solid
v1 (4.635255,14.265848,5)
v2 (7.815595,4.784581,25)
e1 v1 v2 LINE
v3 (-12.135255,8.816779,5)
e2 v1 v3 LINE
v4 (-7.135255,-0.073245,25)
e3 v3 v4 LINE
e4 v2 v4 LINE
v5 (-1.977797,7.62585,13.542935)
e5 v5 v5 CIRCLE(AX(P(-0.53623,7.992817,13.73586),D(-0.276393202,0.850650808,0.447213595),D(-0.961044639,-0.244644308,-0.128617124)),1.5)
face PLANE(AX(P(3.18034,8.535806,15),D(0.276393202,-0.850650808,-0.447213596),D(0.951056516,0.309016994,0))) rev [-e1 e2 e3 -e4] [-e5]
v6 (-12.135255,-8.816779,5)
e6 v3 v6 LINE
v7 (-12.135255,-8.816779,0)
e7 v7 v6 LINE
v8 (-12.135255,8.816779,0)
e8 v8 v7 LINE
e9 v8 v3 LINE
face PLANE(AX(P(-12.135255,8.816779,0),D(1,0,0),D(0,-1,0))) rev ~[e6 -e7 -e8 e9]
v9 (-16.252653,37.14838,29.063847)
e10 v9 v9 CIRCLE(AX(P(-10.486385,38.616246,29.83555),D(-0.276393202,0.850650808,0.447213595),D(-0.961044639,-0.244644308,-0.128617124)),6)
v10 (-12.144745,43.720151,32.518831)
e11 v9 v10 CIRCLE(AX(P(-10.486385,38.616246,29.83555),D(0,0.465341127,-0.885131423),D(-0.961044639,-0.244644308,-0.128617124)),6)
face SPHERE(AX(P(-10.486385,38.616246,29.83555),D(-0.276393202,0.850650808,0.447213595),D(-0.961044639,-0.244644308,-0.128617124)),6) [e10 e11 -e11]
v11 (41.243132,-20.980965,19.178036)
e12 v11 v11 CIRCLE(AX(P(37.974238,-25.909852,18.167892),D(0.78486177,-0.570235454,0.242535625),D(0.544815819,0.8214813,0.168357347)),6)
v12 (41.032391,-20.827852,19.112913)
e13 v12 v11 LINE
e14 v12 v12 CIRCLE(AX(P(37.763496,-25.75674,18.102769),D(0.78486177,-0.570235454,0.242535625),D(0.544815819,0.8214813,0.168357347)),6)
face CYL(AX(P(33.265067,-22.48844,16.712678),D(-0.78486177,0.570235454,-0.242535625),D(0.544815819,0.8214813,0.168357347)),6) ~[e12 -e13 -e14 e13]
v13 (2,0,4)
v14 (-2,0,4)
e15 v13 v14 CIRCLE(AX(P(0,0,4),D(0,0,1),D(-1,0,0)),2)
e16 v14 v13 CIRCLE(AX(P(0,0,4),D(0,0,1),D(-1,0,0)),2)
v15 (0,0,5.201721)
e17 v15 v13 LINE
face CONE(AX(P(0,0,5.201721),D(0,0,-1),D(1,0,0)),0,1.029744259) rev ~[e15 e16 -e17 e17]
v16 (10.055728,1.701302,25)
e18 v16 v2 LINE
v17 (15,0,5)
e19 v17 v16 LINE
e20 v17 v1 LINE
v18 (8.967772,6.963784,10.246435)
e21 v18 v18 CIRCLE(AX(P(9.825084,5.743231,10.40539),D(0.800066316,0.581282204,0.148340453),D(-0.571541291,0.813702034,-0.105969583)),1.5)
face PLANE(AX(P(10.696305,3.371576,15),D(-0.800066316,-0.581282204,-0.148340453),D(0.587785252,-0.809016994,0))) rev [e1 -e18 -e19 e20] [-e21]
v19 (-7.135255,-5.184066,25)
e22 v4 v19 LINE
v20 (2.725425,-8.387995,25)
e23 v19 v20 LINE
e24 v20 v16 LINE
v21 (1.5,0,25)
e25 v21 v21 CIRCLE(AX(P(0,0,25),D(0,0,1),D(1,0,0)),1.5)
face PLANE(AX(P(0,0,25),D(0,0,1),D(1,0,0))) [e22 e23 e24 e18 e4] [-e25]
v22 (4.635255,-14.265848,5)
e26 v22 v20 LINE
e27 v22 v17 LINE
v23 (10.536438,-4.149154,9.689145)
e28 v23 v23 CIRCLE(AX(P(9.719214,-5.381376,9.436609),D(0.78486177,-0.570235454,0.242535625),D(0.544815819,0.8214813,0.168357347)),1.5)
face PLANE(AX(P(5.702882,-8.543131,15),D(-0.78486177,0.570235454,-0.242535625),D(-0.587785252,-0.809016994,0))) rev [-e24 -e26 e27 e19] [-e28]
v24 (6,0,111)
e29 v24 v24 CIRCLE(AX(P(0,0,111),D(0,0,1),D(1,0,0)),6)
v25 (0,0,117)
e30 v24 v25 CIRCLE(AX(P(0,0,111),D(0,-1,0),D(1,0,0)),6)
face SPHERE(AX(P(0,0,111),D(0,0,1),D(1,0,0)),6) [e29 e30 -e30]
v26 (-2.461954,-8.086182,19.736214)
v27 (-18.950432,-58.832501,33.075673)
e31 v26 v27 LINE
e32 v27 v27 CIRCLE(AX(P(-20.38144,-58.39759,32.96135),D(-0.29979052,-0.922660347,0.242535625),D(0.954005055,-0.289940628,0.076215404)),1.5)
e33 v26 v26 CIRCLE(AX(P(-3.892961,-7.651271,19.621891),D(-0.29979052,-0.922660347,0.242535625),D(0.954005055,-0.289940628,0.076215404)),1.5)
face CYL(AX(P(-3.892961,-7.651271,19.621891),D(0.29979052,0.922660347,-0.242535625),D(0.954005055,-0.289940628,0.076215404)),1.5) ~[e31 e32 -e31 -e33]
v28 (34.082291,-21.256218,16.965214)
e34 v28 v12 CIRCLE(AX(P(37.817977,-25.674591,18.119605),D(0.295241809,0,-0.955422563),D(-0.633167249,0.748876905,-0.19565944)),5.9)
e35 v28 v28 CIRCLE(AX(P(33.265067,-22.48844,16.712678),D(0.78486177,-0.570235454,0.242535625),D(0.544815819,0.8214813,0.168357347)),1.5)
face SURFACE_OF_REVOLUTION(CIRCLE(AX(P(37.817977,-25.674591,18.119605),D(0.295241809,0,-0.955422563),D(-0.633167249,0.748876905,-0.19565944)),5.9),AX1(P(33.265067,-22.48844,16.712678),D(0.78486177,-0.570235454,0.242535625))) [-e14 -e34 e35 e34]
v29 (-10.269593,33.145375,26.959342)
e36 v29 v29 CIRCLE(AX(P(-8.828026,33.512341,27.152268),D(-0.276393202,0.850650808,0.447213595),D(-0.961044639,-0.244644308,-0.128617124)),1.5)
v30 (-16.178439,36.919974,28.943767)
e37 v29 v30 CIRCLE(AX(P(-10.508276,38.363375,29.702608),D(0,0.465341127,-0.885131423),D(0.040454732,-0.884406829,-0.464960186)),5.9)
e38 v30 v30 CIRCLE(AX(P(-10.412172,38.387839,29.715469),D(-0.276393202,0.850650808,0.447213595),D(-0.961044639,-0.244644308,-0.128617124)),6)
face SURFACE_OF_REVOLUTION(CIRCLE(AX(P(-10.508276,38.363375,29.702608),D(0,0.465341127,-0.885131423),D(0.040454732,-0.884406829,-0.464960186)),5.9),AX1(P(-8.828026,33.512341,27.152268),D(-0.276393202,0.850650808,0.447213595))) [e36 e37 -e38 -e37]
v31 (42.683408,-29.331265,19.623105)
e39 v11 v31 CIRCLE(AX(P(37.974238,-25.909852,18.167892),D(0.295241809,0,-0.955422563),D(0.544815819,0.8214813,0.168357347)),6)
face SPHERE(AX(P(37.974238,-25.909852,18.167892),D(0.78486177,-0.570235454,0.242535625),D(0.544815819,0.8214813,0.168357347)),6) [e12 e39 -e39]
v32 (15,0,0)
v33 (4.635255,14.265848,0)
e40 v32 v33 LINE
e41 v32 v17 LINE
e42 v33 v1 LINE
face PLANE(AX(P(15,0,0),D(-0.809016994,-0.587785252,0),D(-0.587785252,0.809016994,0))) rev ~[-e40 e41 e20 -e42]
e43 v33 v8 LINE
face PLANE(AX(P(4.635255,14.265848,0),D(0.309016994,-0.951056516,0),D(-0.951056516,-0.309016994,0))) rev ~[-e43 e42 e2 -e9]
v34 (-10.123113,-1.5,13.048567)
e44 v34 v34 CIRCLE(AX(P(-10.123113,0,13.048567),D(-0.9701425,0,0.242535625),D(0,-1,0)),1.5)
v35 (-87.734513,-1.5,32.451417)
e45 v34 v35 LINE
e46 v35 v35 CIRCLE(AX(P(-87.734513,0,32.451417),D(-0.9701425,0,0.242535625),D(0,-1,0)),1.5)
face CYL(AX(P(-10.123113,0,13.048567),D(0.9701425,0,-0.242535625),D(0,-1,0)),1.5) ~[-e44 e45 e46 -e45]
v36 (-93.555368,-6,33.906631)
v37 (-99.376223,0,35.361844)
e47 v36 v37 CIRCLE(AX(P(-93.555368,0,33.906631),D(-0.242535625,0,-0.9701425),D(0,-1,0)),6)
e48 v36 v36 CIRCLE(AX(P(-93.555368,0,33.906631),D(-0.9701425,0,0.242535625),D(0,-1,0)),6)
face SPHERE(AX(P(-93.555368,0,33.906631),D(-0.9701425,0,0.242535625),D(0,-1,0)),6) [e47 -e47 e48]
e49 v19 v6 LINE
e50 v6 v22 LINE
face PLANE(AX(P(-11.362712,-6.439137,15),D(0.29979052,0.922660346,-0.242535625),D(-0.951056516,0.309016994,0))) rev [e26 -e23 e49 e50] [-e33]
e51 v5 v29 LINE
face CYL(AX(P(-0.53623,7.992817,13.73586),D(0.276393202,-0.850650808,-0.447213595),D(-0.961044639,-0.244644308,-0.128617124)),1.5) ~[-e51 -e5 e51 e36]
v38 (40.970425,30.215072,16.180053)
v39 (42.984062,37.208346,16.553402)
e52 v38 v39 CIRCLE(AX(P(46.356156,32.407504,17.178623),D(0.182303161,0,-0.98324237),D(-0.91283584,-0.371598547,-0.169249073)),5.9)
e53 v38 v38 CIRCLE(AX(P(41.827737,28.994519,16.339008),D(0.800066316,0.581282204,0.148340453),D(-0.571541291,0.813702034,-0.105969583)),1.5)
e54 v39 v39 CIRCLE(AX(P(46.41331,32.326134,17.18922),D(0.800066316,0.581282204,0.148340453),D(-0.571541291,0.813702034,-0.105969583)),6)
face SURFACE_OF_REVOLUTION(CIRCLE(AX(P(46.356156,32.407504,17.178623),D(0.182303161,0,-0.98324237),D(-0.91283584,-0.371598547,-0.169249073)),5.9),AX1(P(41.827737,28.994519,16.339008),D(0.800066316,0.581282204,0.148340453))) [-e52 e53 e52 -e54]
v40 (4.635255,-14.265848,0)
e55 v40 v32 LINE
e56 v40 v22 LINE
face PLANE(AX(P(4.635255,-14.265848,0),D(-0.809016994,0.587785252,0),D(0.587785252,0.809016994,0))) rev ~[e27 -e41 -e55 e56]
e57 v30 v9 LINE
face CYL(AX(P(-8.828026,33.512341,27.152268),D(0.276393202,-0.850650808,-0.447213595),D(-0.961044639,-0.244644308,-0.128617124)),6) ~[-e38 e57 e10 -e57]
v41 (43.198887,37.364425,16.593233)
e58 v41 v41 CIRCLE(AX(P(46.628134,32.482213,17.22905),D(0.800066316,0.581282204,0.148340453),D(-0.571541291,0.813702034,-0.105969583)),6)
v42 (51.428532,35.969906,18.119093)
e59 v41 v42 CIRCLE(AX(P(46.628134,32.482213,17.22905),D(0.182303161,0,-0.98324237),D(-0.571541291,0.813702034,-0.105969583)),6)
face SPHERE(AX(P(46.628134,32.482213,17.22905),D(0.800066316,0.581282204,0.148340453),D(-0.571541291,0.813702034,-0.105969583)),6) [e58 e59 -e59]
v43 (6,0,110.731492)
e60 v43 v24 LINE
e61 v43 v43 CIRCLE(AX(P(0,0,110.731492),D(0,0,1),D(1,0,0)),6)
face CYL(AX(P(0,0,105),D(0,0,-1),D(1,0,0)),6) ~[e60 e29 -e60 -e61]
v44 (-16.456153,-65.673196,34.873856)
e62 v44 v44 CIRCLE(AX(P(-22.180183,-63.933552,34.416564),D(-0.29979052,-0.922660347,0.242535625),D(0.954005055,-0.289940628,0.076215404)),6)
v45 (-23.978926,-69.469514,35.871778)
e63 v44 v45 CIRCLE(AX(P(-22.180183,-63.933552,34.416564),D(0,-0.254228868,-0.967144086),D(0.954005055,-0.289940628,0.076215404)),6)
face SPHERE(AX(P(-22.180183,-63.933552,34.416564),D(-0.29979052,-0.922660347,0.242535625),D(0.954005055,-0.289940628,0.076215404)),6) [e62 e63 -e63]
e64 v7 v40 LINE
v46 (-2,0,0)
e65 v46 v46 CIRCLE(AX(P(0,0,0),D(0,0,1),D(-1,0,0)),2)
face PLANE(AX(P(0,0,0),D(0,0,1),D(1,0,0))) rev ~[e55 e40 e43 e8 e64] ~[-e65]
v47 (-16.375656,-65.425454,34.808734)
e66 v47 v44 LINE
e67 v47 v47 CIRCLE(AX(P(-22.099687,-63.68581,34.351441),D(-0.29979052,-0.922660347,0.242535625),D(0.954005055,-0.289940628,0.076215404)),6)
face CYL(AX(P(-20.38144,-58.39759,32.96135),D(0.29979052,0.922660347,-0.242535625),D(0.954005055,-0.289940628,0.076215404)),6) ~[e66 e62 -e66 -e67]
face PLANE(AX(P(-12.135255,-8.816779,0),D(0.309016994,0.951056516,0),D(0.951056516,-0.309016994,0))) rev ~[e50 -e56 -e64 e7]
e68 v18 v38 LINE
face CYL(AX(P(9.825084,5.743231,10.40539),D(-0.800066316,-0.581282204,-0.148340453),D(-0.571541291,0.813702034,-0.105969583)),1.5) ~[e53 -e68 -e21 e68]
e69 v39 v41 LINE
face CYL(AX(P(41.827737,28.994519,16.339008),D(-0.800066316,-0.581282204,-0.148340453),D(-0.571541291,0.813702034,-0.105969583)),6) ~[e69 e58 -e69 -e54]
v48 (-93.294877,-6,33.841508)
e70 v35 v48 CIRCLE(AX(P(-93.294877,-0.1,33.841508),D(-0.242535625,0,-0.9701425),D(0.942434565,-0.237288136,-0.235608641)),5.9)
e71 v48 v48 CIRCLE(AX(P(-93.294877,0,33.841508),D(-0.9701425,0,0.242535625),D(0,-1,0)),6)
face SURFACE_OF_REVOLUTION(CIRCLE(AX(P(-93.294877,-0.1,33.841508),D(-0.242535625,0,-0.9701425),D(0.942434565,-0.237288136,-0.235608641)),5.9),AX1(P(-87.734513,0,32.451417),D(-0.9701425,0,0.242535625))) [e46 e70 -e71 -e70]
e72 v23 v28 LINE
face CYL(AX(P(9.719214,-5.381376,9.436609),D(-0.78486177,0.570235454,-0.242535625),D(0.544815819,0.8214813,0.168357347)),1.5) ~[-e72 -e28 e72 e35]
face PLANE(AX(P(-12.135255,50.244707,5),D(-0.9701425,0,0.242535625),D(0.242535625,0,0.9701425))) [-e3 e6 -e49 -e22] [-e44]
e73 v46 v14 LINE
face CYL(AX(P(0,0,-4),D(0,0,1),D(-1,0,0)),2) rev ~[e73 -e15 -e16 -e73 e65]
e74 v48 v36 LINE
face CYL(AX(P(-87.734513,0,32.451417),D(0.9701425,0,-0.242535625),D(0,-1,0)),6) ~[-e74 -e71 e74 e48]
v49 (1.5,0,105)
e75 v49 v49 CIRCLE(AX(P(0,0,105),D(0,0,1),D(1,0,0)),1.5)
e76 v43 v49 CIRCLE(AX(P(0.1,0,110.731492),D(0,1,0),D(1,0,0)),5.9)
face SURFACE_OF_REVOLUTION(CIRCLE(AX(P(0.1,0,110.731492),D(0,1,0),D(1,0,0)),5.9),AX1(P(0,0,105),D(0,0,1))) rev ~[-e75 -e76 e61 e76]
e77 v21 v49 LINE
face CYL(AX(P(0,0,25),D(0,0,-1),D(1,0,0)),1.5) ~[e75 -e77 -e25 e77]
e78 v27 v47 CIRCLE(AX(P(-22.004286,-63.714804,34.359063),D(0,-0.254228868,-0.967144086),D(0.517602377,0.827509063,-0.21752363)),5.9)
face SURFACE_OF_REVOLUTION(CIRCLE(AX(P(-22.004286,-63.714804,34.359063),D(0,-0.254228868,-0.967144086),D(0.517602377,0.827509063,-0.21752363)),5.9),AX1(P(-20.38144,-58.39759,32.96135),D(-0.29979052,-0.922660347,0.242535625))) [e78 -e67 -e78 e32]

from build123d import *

# Parameters (mm, degrees)
F1_DEPTH    = 25
F2_SIZE2    = 5
F2_SIZE     = 20
F3_SIZE2    = 5
F3_SIZE     = 20
F4_SIZE2    = 3
F4_SIZE     = 20
F5_SIZE2    = 10
F5_SIZE     = 20
F6_T1_DEPTH = 105.7467241961
F7_R        = 1.5
F13_DEPTH   = 80
F8_R        = 1.5
F14_DEPTH   = 30
F9_R        = 1.5
F15_DEPTH   = 40
F10_R       = 1.5
F16_DEPTH   = 30
F11_R       = 1.5
F17_DEPTH   = 80
F12_R       = 1.5
F18_DEPTH   = 55
F19_R       = 6
F25_DEPTH   = 12
F20_R       = 6
F26_DEPTH   = 12
F21_R       = 6
F27_DEPTH   = 12
F22_R       = 6
F28_DEPTH   = 12
F23_R       = 6
F29_DEPTH   = 12
F24_R       = 6
F30_DEPTH   = 12
F31_R       = 6
F34_D       = 4
F34_DEPTH   = 4
F34_TIP     = 1.2017212381


# Not quite as in the source:
# - a fillet or chamfer that OpenCascade refuses, or shapes differently, is made with other operations: its cross-section is extruded or revolved along the edge and cut away or added


with BuildPart() as f1:
    # F0 (on Top) → F1 (new body)
    with BuildSketch(Plane.XY):
        Polygon((15, 0), (4.6352549156, 14.2658477444), (-12.1352549156, 8.8167787844), (-12.1352549156, -8.8167787844), (4.6352549156, -14.2658477444), align=None)
    extrude(amount=F1_DEPTH)

    # F2
    f2_edges = [f1.edges().sort_by_distance(p)[0] for p in [
        (-3.75, -11.541313, 25),
    ]]
    f2_side = f1.faces().sort_by_distance((-3.75, -11.541313, 12.5))[0]
    chamfer(f2_edges, length=F2_SIZE, length2=F2_SIZE2, reference=f2_side)

    # F3
    f3_edges = [f1.edges().sort_by_distance(p)[0] for p in [
        (11.362712, -5.006297, 25),
    ]]
    f3_side = f1.faces().sort_by_distance((10.379872, -6.359061, 11.710138))[0]
    chamfer(f3_edges, length=F3_SIZE, length2=F3_SIZE2, reference=f3_side)

    # F4
    f4_edges = [f1.edges().sort_by_distance(p)[0] for p in [
        (8.272542, 9.259551, 25),
    ]]
    f4_side = f1.faces().sort_by_distance((9.255383, 7.906786, 11.710138))[0]
    chamfer(f4_edges, length=F4_SIZE, length2=F4_SIZE2, reference=f4_side)

    # F5
    f5_edges = [f1.edges().sort_by_distance(p)[0] for p in [
        (-5.25, 11.053934, 25),
    ]]
    f5_side = f1.faces().sort_by_distance((-4.319172, 11.356378, 12.050432))[0]
    chamfer(f5_edges, length=F5_SIZE, length2=F5_SIZE2, reference=f5_side)

    # F6: chamfer of 20 x 5 on 1 edges, made by hand

    # F6_s2 → F6_t1 (cut)
    with BuildSketch(Plane.XZ.offset(-50.2447065374)):
        Polygon((-12.1352549156, 5), (-7.1352549156, 25), (-12.1352549156, 25), align=None)
    extrude(amount=F6_T1_DEPTH, mode=Mode.SUBTRACT)

    # F7 (on face) → F13 (join)
    with BuildSketch(Plane(origin=(-12.5978869794, 0, 3.1494717449), x_dir=(0, -1, 0), z_dir=(-0.9701425001, 0, 0.242535625))):
        with Locations((0, 10.203753598)):
            Circle(F7_R)
    extrude(amount=F13_DEPTH)

    # F8 (on face) → F14 (join)
    with BuildSketch(Plane(origin=(-3.6180339887, 11.1351636441, 5.8541019662), x_dir=(-0.9610446388, -0.2446443083, -0.1286171243), z_dir=(-0.2763932023, 0.8506508084, 0.4472135955))):
        with Locations((-3.206722904, 8.4386551753)):
            Circle(F8_R)
    extrude(amount=F14_DEPTH)

    # F9 (on face) → F15 (join)
    with BuildSketch(Plane(origin=(10.1950026441, 7.4071029941, 1.8902574448), x_dir=(-0.5715412914, 0.8137020337, -0.1059695832), z_dir=(0.8000663158, 0.5812822037, 0.1483404529))):
        with Locations((-2.0448169671, 8.4398761392)):
            Circle(F9_R)
    extrude(amount=F15_DEPTH)

    # F10 (on face) → F16 (join)
    with BuildSketch(Plane(origin=(10.1919046596, -7.4048521765, 3.1494717449), x_dir=(0.5448158193, 0.8214813003, 0.168357347), z_dir=(0.7848617696, -0.5702354542, 0.242535625))):
        with Locations((2.4632040877, 6.1464309692)):
            Circle(F10_R)
    extrude(amount=F16_DEPTH)

    # F11 (on face) → F17 (join)
    with BuildSketch(Plane.XY.offset(25)):
        Circle(F11_R)
    extrude(amount=F17_DEPTH)

    # F12 (on face) → F18 (join)
    with BuildSketch(Plane(origin=(-3.8929611699, -11.9813025033, 3.1494717449), x_dir=(0.9540050547, -0.2899406279, 0.0762154044), z_dir=(-0.2997905195, -0.9226603465, 0.242535625))):
        with Locations((0, 17.0320216566)):
            Circle(F12_R)
    extrude(amount=F18_DEPTH)

    # F19 (on face) → F25 (join)
    with BuildSketch(Plane(origin=(-20.3814397429, -62.7276215607, 16.4889311219), x_dir=(0.9540050547, -0.2899406279, 0.0762154044), z_dir=(-0.2997905195, -0.9226603465, 0.242535625))):
        with Locations((0, 17.0320216566)):
            Circle(F19_R)
    extrude(amount=F25_DEPTH)

    # F20 (on face) → F26 (join)
    with BuildSketch(Plane(origin=(33.737757747, -24.5119158028, 10.4255404959), x_dir=(0.5448158193, 0.8214813003, 0.168357347), z_dir=(0.7848617696, -0.5702354542, 0.242535625))):
        with Locations((2.4632040877, 6.1464309692)):
            Circle(F20_R)
    extrude(amount=F26_DEPTH)

    # F21 (on face) → F27 (join)
    with BuildSketch(Plane(origin=(42.1976552771, 30.6583911409, 7.823875562), x_dir=(-0.5715412914, 0.8137020337, -0.1059695832), z_dir=(0.8000663158, 0.5812822037, 0.1483404529))):
        with Locations((-2.0448169671, 8.4398761392)):
            Circle(F21_R)
    extrude(amount=F27_DEPTH)

    # F22 (on face) → F28 (join)
    with BuildSketch(Plane(origin=(-11.9098300563, 36.6546878947, 19.2705098312), x_dir=(-0.9610446388, -0.2446443083, -0.1286171243), z_dir=(-0.2763932023, 0.8506508084, 0.4472135955))):
        with Locations((-3.206722904, 8.4386551753)):
            Circle(F22_R)
    extrude(amount=F28_DEPTH)

    # F23 (on face) → F29 (join)
    with BuildSketch(Plane(origin=(-90.209286991, 0, 22.5523217478), x_dir=(0, -1, 0), z_dir=(-0.9701425001, 0, 0.242535625))):
        with Locations((0, 10.203753598)):
            Circle(F23_R)
    extrude(amount=F29_DEPTH)

    # F24 (on face) → F30 (join)
    with BuildSketch(Plane.XY.offset(105)):
        Circle(F24_R)
    extrude(amount=F30_DEPTH)

    # F31
    f31_edges = [f1.edges().sort_by_distance(p)[0] for p in [
        (-99.376223, 6, 35.361844),
        (-6.378477, 45.188017, 33.290534),
        (-6, 0, 117),
        (54.85778, 31.087694, 18.754911),
        (-29.702956, -67.72987, 35.414485),
        (39.414513, -34.260153, 18.612961),
    ]]
    fillet(f31_edges, radius=F31_R)

    # F32: fillet of radius 5.9 on 6 edges, made by hand

    # F32_s1 → F32_t2 (revolve, cut)
    with BuildSketch(Plane(origin=(0, -3.9268533113, 7.4693188604), x_dir=(1, 0, 0), z_dir=(0, 0.4653411272, -0.8851314226))):
        with BuildLine():
            ThreePointArc((-10.2695931595, -41.8833034178), (-13.9610472636, -42.9942942584), (-16.1784394484, -46.1477536208))
            Line((-16.1784394484, -46.1477536208), (-14.594294034, -40.6395340077))
            Line((-14.594294034, -40.6395340077), (-10.2695931595, -41.8833034178))
        make_face()
    revolve(axis=Axis((-8.8280262013, 33.5123410902, 27.15226817), (-0.2763932023, 0.8506508084, 0.4472135955)), mode=Mode.SUBTRACT)

    # F32_s3 → F32_t4 (revolve, cut)
    with BuildSketch(Plane(origin=(-1.5386160993, 0, 8.2984438146), x_dir=(0, 1, 0), z_dir=(0.1823031611, 0, -0.9832423696))):
        with BuildLine():
            ThreePointArc((30.2150724668, 43.2335322221), (34.0656604389, 43.0488532565), (37.208345891, 45.2814889635))
            Line((37.208345891, 45.2814889635), (33.8767316186, 40.6177623056))
            Line((33.8767316186, 40.6177623056), (30.2150724668, 43.2335322221))
        make_face()
    revolve(axis=Axis((41.8277365078, 28.9945194162, 16.3390077783), (0.8000663158, 0.5812822037, 0.1483404529)), mode=Mode.SUBTRACT)

    # F32_s5 → F32_t6 (revolve, cut)
    with BuildSketch(Plane.XZ):
        with BuildLine():
            ThreePointArc((6, 110.7314919524), (4.7405818601, 107.0880046119), (1.5, 105))
            Line((1.5, 105), (6, 105))
            Line((6, 105), (6, 110.7314919524))
        make_face()
    revolve(axis=Axis((0, 0, 105), (0, 0, 1)), mode=Mode.SUBTRACT)

    # F32_s7 → F32_t8 (revolve, cut)
    with BuildSketch(Plane(origin=(-1.8146833973, 0, 5.8724388313), x_dir=(0, 1, 0), z_dir=(0.2952418088, 0, -0.9554225632))):
        with BuildLine():
            ThreePointArc((-21.2562177554, 37.5718299013), (-19.7847946135, 41.1349813138), (-20.8278518207, 44.8462029069))
            Line((-20.8278518207, 44.8462029069), (-17.559551904, 40.1378894452))
            Line((-17.559551904, 40.1378894452), (-21.2562177554, 37.5718299013))
        make_face()
    revolve(axis=Axis((33.2650669029, -22.4884397059, 16.7126778325), (0.7848617696, -0.5702354542, 0.242535625)), mode=Mode.SUBTRACT)

    # F32_s9 → F32_t10 (revolve, cut)
    with BuildSketch(Plane(origin=(0, 4.3300315839, 16.4724190146), x_dir=(1, 0, 0), z_dir=(0, -0.2542288679, -0.9671440858))):
        with BuildLine():
            ThreePointArc((-18.9504321609, 65.3082962809), (-16.4848646735, 68.2717589543), (-16.3756563646, 72.1252259123))
            Line((-16.3756563646, 72.1252259123), (-14.6574094147, 66.6573536187))
            Line((-14.6574094147, 66.6573536187), (-18.9504321609, 65.3082962809))
        make_face()
    revolve(axis=Axis((-20.3814397429, -58.3975899768, 32.9613501365), (-0.2997905195, -0.9226603465, 0.242535625)), mode=Mode.SUBTRACT)

    # F32_s11 → F32_t12 (revolve, cut)
    with BuildSketch(Plane(origin=(2.4747737566, 0, 9.8990950265), x_dir=(0, 1, 0), z_dir=(-0.242535625, 0, -0.9701425001))):
        with BuildLine():
            ThreePointArc((-1.5, -92.9856046689), (-4.7405818601, -95.0736092808), (-6, -98.7170966213))
            Line((-6, -98.7170966213), (-6, -92.9856046689))
            Line((-6, -92.9856046689), (-1.5, -92.9856046689))
        make_face()
    revolve(axis=Axis((-87.7345132344, 0, 32.4514167742), (-0.9701425001, 0, 0.242535625)), mode=Mode.SUBTRACT)

    # F34
    with Locations(Plane(origin=(0, 0, 0), x_dir=(1, 0, 0), z_dir=(0, 0, -1))):
        with Locations((0, 0)):
            Hole(F34_D / 2, depth=F34_DEPTH)
            with Locations((0, 0, -(F34_DEPTH + F34_TIP / 2))):  # 118° drill point
                Cone(0, F34_D / 2, F34_TIP, mode=Mode.SUBTRACT)


solid = f1.part
